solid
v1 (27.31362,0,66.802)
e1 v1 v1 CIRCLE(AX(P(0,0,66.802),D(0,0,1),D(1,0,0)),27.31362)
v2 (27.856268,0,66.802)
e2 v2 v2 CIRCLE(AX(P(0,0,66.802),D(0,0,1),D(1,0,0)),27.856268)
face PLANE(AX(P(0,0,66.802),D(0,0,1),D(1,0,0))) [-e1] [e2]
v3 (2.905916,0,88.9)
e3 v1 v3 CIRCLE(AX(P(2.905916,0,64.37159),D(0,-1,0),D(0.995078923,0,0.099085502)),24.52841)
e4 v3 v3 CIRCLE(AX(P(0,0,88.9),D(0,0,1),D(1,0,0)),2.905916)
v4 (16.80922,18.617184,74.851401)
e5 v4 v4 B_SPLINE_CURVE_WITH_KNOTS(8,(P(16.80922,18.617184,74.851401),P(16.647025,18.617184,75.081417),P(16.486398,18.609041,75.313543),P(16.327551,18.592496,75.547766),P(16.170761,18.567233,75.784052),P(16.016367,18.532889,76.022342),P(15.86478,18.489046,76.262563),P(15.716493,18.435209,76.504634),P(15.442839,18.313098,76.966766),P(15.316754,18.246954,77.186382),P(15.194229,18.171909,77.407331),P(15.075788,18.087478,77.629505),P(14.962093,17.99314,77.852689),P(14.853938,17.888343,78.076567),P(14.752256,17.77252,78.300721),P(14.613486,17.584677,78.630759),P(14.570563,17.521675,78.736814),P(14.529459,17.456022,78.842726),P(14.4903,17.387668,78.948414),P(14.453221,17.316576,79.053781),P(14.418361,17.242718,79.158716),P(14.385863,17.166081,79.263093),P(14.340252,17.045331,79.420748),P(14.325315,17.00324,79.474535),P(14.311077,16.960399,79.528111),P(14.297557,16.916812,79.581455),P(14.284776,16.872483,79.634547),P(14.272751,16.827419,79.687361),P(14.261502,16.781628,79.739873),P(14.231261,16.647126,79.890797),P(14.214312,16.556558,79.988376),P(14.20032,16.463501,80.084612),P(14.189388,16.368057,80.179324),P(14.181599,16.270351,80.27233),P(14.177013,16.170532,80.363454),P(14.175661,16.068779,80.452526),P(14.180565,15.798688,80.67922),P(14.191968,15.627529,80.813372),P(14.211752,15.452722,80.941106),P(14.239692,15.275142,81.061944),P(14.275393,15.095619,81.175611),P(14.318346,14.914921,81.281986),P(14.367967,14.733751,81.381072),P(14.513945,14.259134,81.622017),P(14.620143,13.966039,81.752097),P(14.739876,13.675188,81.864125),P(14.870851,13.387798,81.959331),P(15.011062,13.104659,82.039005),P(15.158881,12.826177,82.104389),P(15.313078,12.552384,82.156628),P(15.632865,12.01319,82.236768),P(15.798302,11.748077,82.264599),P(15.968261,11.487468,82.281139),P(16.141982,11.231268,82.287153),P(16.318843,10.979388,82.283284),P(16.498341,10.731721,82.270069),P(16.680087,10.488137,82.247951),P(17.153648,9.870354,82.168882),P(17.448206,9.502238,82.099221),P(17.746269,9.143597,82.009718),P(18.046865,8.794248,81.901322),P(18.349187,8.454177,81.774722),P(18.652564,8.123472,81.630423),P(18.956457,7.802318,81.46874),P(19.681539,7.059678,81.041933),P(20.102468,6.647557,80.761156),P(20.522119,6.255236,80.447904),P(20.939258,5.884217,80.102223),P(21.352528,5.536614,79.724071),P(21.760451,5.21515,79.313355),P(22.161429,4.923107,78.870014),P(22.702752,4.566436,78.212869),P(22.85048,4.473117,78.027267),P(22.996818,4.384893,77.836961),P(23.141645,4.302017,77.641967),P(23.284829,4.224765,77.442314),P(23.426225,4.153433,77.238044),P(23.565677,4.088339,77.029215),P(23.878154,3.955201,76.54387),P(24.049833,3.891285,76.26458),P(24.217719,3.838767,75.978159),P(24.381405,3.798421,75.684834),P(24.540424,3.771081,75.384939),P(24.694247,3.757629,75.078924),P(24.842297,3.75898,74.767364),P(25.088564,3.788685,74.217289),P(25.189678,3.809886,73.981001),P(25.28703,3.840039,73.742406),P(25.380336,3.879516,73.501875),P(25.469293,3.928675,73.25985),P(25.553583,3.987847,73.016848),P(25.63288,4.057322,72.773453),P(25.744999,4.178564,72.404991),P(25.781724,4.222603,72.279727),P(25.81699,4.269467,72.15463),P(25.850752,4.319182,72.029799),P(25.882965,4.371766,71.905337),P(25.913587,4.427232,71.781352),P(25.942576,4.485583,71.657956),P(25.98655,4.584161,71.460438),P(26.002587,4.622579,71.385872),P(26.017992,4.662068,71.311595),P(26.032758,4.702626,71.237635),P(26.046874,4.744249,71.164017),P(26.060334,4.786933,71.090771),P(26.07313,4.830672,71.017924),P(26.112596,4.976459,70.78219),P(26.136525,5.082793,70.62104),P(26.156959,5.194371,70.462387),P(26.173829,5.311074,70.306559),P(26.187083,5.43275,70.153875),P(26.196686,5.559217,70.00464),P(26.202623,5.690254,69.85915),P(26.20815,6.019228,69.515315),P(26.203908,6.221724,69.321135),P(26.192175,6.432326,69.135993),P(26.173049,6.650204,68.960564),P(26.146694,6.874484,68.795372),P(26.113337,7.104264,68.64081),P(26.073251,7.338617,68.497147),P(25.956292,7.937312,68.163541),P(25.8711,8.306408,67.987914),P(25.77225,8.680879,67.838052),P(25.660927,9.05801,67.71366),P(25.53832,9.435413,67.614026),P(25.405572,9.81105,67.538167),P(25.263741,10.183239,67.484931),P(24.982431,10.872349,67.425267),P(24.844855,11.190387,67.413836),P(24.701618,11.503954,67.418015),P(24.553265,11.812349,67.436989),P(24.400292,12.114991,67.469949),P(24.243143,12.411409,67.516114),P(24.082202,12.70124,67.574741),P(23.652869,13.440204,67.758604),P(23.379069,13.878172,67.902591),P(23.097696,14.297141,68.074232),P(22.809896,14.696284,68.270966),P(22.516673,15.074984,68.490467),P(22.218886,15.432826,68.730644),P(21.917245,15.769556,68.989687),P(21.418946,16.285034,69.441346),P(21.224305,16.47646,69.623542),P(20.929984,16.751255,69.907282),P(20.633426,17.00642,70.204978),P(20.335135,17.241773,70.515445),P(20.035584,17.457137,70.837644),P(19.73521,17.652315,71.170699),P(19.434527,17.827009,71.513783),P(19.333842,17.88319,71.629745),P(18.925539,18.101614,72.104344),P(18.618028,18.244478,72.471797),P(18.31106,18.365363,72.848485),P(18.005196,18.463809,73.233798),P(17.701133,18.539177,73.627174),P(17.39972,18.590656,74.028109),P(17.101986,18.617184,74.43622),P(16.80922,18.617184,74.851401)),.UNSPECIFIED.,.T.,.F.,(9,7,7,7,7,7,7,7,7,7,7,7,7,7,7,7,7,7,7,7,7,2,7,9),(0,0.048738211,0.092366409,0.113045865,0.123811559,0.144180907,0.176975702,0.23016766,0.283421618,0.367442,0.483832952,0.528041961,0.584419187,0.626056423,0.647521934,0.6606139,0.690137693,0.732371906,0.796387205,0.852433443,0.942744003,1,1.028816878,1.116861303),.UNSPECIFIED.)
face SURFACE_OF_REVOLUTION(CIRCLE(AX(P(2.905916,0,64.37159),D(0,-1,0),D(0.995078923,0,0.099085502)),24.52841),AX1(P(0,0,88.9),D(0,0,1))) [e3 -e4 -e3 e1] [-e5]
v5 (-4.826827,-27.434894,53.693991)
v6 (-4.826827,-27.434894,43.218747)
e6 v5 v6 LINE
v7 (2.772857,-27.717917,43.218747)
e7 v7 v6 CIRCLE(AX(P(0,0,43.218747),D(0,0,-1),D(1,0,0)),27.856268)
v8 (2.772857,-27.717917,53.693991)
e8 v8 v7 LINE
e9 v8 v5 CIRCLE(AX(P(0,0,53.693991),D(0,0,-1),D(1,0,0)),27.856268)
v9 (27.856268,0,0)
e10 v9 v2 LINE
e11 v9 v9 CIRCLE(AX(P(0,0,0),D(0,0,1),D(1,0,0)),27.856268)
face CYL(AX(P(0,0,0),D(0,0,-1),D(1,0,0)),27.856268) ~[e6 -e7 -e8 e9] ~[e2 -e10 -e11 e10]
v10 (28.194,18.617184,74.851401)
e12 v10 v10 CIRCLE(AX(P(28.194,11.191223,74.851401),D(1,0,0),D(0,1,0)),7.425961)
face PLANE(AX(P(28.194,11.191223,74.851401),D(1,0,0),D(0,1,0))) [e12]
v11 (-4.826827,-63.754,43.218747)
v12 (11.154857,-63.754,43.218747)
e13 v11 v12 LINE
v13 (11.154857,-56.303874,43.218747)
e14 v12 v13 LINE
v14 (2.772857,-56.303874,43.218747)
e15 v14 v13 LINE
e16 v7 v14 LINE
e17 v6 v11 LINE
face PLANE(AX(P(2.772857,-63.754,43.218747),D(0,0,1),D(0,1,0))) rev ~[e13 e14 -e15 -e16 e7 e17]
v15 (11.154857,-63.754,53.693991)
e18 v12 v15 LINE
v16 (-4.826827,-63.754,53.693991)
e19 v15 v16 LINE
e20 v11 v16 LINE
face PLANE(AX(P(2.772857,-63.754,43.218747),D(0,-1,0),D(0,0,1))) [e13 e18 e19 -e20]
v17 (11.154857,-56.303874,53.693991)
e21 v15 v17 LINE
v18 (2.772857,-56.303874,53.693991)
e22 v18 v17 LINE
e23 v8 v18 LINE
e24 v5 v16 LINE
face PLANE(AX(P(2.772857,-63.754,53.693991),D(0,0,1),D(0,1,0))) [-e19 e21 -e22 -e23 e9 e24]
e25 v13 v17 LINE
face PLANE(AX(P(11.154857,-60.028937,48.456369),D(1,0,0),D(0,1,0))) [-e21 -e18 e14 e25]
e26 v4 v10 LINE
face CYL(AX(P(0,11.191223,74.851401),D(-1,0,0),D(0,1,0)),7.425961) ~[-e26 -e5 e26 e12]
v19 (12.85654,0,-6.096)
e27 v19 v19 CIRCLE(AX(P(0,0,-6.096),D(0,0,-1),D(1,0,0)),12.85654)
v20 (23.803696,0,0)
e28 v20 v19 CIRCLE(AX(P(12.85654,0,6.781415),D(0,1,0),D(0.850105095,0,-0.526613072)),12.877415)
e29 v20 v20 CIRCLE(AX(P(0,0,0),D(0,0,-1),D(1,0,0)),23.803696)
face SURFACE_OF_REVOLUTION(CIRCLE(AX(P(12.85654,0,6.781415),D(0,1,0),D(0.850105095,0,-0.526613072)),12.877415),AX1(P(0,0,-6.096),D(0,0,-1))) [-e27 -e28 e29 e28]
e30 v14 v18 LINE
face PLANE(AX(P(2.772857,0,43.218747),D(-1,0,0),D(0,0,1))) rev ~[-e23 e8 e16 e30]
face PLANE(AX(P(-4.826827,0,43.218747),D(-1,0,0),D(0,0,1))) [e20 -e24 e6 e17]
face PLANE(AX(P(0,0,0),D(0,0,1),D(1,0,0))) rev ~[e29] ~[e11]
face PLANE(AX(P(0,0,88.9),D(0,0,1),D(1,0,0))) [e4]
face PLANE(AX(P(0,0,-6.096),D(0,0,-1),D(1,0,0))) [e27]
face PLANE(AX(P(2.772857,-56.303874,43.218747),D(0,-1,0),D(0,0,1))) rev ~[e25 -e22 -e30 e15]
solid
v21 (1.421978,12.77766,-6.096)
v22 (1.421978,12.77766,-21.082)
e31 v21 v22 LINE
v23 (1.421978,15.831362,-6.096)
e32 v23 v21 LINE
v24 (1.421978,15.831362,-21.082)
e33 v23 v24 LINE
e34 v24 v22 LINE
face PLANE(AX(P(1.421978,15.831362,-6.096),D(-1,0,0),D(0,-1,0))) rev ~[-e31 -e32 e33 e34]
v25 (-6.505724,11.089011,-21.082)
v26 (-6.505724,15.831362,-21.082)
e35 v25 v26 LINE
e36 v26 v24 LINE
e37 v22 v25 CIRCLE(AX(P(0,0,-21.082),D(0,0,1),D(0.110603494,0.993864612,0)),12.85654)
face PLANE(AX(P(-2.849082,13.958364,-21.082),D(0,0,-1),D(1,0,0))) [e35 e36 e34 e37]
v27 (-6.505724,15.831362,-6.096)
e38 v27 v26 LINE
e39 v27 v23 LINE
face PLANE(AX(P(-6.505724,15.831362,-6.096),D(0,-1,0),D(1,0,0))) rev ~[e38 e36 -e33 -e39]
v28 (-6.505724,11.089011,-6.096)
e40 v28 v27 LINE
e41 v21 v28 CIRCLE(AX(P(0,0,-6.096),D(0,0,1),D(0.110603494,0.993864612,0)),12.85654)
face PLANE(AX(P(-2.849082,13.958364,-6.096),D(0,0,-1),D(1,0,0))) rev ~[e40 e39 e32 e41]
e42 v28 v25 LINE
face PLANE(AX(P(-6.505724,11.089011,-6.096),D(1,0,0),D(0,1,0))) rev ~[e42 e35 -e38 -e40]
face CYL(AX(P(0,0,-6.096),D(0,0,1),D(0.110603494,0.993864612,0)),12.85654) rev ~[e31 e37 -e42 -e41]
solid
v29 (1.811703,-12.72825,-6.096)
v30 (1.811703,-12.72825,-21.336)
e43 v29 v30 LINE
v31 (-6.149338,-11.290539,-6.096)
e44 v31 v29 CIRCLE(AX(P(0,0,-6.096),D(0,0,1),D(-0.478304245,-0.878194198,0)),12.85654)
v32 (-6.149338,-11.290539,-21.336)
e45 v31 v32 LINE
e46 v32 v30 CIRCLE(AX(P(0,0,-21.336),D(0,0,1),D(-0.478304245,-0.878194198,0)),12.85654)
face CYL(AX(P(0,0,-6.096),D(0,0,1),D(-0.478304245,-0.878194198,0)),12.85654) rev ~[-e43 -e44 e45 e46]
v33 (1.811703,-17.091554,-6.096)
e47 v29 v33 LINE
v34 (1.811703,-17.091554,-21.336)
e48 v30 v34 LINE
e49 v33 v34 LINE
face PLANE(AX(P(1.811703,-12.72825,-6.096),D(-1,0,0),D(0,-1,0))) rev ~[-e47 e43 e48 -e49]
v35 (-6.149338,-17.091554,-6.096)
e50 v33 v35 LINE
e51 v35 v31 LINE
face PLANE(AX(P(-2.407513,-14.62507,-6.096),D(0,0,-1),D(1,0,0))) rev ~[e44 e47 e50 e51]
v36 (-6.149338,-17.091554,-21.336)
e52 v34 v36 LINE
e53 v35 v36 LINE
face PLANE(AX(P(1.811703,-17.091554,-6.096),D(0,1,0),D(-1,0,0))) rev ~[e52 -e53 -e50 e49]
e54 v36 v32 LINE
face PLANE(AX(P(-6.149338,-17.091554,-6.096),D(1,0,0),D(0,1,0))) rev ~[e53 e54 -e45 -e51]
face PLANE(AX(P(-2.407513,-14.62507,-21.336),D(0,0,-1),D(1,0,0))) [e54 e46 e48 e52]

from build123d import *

# Parameters (mm, degrees)
F0_R      = 27.8562682198
F1_DEPTH  = 66.802
F2_R      = 27.3136197641
F3_DEPTH  = 22.098
F5_R      = 23.8036961542
F6_DEPTH  = 6.096
F9_DEPTH  = 15.24
F11_DEPTH = 14.986
F12_R     = 7.4259610206
F13_DEPTH = 28.194
F14_W     = 7.5996846426
F14_H     = 10.4752443731
F15_DEPTH = 63.754
F16_W     = 7.4501263418
F16_H     = 10.4752443731
F17_DEPTH = 8.382


# Not quite as in the source:
# - a fillet or chamfer that OpenCascade refuses, or shapes differently, is made with other operations: its cross-section is extruded or revolved along the edge and cut away or added


with BuildPart() as f1:
    # F0 (on Top) → F1 (new body)
    with BuildSketch(Plane.XY):
        Circle(F0_R)
    extrude(amount=F1_DEPTH)

    # F2 (on face) → F3 (join)
    with BuildSketch(Plane.XY.offset(66.802)):
        Circle(F2_R)
    extrude(amount=F3_DEPTH)

    # F4: fillet of radius 24.5284097937 on 1 edges, made by hand

    # F4_s1 → F4_t2 (revolve, cut)
    with BuildSketch(Plane.XZ):
        with BuildLine():
            ThreePointArc((27.3136197641, 66.802), (19.3684311501, 82.5547826432), (2.9059161596, 88.9))
            Line((2.9059161596, 88.9), (27.3136197641, 88.9))
            Line((27.3136197641, 88.9), (27.3136197641, 66.802))
        make_face()
    revolve(axis=Axis((0, 0, 88.9), (0, 0, 1)), mode=Mode.SUBTRACT)

    # F5 (on face) → F6 (join)
    with BuildSketch(Plane(origin=(0, 0, 0), x_dir=(1, 0, 0), z_dir=(0, 0, -1))):
        Circle(F5_R)
    extrude(amount=F6_DEPTH)

    # F7: fillet of radius 12.8774151417 on 1 edges, made by hand

    # F7_s1 → F7_t2 (revolve, cut)
    with BuildSketch(Plane.XZ):
        with BuildLine():
            ThreePointArc((23.8036961542, 0), (19.1215508115, -4.4692497), (12.8565399295, -6.096))
            Line((12.8565399295, -6.096), (23.8036961542, -6.096))
            Line((23.8036961542, -6.096), (23.8036961542, 0))
        make_face()
    revolve(axis=Axis((0, 0, -6.096), (0, 0, -1)), mode=Mode.SUBTRACT)

    # F12 (on Right) → F13 (join)
    with BuildSketch(Plane.YZ):
        with Locations((11.1912228167, 74.8514011502)):
            Circle(F12_R)
    extrude(amount=F13_DEPTH)

    # F14 (on Front) → F15 (join)
    with BuildSketch(Plane.XZ):
        with Locations((-1.0269851191, 48.4563689679)):
            Rectangle(F14_W, F14_H)
    extrude(amount=F15_DEPTH)

    # F16 (on face) → F17 (join)
    with BuildSketch(Plane.YZ.offset(2.7728572022)):
        with Locations((-60.0289368291, 48.4563689679)):
            Rectangle(F16_W, F16_H)
    extrude(amount=F17_DEPTH)


with BuildPart() as f9:
    # F8 (on face) → F9 (new body)
    with BuildSketch(Plane(origin=(0, 0, -6.096), x_dir=(1, 0, 0), z_dir=(0, 0, -1))):
        with BuildLine():
            ThreePointArc((-6.149337627, 11.2905387696), (-2.2848463598, 12.6518811278), (1.8117026193, 12.7282501774))
            Line((1.8117026193, 12.7282501774), (1.8117026193, 17.0915536582))
            Line((1.8117026193, 17.0915536582), (-6.149337627, 17.0915536582))
            Line((-6.149337627, 17.0915536582), (-6.149337627, 11.2905387696))
        make_face()
    extrude(amount=F9_DEPTH)


with BuildPart() as f11:
    # F10 (on face) → F11 (new body)
    with BuildSketch(Plane(origin=(0, 0, -6.096), x_dir=(1, 0, 0), z_dir=(0, 0, -1))):
        with BuildLine():
            Line((-6.505724193, -15.8313624561), (1.4219782315, -15.8313624561))
            Line((1.4219782315, -15.8313624561), (1.4219782315, -12.7776600701))
            ThreePointArc((1.4219782315, -12.7776600701), (-2.6784327348, -12.5744430113), (-6.505724193, -11.0890113032))
            Line((-6.505724193, -11.0890113032), (-6.505724193, -15.8313624561))
        make_face()
    extrude(amount=F11_DEPTH)


solid = Compound([f1.part, f9.part, f11.part])
